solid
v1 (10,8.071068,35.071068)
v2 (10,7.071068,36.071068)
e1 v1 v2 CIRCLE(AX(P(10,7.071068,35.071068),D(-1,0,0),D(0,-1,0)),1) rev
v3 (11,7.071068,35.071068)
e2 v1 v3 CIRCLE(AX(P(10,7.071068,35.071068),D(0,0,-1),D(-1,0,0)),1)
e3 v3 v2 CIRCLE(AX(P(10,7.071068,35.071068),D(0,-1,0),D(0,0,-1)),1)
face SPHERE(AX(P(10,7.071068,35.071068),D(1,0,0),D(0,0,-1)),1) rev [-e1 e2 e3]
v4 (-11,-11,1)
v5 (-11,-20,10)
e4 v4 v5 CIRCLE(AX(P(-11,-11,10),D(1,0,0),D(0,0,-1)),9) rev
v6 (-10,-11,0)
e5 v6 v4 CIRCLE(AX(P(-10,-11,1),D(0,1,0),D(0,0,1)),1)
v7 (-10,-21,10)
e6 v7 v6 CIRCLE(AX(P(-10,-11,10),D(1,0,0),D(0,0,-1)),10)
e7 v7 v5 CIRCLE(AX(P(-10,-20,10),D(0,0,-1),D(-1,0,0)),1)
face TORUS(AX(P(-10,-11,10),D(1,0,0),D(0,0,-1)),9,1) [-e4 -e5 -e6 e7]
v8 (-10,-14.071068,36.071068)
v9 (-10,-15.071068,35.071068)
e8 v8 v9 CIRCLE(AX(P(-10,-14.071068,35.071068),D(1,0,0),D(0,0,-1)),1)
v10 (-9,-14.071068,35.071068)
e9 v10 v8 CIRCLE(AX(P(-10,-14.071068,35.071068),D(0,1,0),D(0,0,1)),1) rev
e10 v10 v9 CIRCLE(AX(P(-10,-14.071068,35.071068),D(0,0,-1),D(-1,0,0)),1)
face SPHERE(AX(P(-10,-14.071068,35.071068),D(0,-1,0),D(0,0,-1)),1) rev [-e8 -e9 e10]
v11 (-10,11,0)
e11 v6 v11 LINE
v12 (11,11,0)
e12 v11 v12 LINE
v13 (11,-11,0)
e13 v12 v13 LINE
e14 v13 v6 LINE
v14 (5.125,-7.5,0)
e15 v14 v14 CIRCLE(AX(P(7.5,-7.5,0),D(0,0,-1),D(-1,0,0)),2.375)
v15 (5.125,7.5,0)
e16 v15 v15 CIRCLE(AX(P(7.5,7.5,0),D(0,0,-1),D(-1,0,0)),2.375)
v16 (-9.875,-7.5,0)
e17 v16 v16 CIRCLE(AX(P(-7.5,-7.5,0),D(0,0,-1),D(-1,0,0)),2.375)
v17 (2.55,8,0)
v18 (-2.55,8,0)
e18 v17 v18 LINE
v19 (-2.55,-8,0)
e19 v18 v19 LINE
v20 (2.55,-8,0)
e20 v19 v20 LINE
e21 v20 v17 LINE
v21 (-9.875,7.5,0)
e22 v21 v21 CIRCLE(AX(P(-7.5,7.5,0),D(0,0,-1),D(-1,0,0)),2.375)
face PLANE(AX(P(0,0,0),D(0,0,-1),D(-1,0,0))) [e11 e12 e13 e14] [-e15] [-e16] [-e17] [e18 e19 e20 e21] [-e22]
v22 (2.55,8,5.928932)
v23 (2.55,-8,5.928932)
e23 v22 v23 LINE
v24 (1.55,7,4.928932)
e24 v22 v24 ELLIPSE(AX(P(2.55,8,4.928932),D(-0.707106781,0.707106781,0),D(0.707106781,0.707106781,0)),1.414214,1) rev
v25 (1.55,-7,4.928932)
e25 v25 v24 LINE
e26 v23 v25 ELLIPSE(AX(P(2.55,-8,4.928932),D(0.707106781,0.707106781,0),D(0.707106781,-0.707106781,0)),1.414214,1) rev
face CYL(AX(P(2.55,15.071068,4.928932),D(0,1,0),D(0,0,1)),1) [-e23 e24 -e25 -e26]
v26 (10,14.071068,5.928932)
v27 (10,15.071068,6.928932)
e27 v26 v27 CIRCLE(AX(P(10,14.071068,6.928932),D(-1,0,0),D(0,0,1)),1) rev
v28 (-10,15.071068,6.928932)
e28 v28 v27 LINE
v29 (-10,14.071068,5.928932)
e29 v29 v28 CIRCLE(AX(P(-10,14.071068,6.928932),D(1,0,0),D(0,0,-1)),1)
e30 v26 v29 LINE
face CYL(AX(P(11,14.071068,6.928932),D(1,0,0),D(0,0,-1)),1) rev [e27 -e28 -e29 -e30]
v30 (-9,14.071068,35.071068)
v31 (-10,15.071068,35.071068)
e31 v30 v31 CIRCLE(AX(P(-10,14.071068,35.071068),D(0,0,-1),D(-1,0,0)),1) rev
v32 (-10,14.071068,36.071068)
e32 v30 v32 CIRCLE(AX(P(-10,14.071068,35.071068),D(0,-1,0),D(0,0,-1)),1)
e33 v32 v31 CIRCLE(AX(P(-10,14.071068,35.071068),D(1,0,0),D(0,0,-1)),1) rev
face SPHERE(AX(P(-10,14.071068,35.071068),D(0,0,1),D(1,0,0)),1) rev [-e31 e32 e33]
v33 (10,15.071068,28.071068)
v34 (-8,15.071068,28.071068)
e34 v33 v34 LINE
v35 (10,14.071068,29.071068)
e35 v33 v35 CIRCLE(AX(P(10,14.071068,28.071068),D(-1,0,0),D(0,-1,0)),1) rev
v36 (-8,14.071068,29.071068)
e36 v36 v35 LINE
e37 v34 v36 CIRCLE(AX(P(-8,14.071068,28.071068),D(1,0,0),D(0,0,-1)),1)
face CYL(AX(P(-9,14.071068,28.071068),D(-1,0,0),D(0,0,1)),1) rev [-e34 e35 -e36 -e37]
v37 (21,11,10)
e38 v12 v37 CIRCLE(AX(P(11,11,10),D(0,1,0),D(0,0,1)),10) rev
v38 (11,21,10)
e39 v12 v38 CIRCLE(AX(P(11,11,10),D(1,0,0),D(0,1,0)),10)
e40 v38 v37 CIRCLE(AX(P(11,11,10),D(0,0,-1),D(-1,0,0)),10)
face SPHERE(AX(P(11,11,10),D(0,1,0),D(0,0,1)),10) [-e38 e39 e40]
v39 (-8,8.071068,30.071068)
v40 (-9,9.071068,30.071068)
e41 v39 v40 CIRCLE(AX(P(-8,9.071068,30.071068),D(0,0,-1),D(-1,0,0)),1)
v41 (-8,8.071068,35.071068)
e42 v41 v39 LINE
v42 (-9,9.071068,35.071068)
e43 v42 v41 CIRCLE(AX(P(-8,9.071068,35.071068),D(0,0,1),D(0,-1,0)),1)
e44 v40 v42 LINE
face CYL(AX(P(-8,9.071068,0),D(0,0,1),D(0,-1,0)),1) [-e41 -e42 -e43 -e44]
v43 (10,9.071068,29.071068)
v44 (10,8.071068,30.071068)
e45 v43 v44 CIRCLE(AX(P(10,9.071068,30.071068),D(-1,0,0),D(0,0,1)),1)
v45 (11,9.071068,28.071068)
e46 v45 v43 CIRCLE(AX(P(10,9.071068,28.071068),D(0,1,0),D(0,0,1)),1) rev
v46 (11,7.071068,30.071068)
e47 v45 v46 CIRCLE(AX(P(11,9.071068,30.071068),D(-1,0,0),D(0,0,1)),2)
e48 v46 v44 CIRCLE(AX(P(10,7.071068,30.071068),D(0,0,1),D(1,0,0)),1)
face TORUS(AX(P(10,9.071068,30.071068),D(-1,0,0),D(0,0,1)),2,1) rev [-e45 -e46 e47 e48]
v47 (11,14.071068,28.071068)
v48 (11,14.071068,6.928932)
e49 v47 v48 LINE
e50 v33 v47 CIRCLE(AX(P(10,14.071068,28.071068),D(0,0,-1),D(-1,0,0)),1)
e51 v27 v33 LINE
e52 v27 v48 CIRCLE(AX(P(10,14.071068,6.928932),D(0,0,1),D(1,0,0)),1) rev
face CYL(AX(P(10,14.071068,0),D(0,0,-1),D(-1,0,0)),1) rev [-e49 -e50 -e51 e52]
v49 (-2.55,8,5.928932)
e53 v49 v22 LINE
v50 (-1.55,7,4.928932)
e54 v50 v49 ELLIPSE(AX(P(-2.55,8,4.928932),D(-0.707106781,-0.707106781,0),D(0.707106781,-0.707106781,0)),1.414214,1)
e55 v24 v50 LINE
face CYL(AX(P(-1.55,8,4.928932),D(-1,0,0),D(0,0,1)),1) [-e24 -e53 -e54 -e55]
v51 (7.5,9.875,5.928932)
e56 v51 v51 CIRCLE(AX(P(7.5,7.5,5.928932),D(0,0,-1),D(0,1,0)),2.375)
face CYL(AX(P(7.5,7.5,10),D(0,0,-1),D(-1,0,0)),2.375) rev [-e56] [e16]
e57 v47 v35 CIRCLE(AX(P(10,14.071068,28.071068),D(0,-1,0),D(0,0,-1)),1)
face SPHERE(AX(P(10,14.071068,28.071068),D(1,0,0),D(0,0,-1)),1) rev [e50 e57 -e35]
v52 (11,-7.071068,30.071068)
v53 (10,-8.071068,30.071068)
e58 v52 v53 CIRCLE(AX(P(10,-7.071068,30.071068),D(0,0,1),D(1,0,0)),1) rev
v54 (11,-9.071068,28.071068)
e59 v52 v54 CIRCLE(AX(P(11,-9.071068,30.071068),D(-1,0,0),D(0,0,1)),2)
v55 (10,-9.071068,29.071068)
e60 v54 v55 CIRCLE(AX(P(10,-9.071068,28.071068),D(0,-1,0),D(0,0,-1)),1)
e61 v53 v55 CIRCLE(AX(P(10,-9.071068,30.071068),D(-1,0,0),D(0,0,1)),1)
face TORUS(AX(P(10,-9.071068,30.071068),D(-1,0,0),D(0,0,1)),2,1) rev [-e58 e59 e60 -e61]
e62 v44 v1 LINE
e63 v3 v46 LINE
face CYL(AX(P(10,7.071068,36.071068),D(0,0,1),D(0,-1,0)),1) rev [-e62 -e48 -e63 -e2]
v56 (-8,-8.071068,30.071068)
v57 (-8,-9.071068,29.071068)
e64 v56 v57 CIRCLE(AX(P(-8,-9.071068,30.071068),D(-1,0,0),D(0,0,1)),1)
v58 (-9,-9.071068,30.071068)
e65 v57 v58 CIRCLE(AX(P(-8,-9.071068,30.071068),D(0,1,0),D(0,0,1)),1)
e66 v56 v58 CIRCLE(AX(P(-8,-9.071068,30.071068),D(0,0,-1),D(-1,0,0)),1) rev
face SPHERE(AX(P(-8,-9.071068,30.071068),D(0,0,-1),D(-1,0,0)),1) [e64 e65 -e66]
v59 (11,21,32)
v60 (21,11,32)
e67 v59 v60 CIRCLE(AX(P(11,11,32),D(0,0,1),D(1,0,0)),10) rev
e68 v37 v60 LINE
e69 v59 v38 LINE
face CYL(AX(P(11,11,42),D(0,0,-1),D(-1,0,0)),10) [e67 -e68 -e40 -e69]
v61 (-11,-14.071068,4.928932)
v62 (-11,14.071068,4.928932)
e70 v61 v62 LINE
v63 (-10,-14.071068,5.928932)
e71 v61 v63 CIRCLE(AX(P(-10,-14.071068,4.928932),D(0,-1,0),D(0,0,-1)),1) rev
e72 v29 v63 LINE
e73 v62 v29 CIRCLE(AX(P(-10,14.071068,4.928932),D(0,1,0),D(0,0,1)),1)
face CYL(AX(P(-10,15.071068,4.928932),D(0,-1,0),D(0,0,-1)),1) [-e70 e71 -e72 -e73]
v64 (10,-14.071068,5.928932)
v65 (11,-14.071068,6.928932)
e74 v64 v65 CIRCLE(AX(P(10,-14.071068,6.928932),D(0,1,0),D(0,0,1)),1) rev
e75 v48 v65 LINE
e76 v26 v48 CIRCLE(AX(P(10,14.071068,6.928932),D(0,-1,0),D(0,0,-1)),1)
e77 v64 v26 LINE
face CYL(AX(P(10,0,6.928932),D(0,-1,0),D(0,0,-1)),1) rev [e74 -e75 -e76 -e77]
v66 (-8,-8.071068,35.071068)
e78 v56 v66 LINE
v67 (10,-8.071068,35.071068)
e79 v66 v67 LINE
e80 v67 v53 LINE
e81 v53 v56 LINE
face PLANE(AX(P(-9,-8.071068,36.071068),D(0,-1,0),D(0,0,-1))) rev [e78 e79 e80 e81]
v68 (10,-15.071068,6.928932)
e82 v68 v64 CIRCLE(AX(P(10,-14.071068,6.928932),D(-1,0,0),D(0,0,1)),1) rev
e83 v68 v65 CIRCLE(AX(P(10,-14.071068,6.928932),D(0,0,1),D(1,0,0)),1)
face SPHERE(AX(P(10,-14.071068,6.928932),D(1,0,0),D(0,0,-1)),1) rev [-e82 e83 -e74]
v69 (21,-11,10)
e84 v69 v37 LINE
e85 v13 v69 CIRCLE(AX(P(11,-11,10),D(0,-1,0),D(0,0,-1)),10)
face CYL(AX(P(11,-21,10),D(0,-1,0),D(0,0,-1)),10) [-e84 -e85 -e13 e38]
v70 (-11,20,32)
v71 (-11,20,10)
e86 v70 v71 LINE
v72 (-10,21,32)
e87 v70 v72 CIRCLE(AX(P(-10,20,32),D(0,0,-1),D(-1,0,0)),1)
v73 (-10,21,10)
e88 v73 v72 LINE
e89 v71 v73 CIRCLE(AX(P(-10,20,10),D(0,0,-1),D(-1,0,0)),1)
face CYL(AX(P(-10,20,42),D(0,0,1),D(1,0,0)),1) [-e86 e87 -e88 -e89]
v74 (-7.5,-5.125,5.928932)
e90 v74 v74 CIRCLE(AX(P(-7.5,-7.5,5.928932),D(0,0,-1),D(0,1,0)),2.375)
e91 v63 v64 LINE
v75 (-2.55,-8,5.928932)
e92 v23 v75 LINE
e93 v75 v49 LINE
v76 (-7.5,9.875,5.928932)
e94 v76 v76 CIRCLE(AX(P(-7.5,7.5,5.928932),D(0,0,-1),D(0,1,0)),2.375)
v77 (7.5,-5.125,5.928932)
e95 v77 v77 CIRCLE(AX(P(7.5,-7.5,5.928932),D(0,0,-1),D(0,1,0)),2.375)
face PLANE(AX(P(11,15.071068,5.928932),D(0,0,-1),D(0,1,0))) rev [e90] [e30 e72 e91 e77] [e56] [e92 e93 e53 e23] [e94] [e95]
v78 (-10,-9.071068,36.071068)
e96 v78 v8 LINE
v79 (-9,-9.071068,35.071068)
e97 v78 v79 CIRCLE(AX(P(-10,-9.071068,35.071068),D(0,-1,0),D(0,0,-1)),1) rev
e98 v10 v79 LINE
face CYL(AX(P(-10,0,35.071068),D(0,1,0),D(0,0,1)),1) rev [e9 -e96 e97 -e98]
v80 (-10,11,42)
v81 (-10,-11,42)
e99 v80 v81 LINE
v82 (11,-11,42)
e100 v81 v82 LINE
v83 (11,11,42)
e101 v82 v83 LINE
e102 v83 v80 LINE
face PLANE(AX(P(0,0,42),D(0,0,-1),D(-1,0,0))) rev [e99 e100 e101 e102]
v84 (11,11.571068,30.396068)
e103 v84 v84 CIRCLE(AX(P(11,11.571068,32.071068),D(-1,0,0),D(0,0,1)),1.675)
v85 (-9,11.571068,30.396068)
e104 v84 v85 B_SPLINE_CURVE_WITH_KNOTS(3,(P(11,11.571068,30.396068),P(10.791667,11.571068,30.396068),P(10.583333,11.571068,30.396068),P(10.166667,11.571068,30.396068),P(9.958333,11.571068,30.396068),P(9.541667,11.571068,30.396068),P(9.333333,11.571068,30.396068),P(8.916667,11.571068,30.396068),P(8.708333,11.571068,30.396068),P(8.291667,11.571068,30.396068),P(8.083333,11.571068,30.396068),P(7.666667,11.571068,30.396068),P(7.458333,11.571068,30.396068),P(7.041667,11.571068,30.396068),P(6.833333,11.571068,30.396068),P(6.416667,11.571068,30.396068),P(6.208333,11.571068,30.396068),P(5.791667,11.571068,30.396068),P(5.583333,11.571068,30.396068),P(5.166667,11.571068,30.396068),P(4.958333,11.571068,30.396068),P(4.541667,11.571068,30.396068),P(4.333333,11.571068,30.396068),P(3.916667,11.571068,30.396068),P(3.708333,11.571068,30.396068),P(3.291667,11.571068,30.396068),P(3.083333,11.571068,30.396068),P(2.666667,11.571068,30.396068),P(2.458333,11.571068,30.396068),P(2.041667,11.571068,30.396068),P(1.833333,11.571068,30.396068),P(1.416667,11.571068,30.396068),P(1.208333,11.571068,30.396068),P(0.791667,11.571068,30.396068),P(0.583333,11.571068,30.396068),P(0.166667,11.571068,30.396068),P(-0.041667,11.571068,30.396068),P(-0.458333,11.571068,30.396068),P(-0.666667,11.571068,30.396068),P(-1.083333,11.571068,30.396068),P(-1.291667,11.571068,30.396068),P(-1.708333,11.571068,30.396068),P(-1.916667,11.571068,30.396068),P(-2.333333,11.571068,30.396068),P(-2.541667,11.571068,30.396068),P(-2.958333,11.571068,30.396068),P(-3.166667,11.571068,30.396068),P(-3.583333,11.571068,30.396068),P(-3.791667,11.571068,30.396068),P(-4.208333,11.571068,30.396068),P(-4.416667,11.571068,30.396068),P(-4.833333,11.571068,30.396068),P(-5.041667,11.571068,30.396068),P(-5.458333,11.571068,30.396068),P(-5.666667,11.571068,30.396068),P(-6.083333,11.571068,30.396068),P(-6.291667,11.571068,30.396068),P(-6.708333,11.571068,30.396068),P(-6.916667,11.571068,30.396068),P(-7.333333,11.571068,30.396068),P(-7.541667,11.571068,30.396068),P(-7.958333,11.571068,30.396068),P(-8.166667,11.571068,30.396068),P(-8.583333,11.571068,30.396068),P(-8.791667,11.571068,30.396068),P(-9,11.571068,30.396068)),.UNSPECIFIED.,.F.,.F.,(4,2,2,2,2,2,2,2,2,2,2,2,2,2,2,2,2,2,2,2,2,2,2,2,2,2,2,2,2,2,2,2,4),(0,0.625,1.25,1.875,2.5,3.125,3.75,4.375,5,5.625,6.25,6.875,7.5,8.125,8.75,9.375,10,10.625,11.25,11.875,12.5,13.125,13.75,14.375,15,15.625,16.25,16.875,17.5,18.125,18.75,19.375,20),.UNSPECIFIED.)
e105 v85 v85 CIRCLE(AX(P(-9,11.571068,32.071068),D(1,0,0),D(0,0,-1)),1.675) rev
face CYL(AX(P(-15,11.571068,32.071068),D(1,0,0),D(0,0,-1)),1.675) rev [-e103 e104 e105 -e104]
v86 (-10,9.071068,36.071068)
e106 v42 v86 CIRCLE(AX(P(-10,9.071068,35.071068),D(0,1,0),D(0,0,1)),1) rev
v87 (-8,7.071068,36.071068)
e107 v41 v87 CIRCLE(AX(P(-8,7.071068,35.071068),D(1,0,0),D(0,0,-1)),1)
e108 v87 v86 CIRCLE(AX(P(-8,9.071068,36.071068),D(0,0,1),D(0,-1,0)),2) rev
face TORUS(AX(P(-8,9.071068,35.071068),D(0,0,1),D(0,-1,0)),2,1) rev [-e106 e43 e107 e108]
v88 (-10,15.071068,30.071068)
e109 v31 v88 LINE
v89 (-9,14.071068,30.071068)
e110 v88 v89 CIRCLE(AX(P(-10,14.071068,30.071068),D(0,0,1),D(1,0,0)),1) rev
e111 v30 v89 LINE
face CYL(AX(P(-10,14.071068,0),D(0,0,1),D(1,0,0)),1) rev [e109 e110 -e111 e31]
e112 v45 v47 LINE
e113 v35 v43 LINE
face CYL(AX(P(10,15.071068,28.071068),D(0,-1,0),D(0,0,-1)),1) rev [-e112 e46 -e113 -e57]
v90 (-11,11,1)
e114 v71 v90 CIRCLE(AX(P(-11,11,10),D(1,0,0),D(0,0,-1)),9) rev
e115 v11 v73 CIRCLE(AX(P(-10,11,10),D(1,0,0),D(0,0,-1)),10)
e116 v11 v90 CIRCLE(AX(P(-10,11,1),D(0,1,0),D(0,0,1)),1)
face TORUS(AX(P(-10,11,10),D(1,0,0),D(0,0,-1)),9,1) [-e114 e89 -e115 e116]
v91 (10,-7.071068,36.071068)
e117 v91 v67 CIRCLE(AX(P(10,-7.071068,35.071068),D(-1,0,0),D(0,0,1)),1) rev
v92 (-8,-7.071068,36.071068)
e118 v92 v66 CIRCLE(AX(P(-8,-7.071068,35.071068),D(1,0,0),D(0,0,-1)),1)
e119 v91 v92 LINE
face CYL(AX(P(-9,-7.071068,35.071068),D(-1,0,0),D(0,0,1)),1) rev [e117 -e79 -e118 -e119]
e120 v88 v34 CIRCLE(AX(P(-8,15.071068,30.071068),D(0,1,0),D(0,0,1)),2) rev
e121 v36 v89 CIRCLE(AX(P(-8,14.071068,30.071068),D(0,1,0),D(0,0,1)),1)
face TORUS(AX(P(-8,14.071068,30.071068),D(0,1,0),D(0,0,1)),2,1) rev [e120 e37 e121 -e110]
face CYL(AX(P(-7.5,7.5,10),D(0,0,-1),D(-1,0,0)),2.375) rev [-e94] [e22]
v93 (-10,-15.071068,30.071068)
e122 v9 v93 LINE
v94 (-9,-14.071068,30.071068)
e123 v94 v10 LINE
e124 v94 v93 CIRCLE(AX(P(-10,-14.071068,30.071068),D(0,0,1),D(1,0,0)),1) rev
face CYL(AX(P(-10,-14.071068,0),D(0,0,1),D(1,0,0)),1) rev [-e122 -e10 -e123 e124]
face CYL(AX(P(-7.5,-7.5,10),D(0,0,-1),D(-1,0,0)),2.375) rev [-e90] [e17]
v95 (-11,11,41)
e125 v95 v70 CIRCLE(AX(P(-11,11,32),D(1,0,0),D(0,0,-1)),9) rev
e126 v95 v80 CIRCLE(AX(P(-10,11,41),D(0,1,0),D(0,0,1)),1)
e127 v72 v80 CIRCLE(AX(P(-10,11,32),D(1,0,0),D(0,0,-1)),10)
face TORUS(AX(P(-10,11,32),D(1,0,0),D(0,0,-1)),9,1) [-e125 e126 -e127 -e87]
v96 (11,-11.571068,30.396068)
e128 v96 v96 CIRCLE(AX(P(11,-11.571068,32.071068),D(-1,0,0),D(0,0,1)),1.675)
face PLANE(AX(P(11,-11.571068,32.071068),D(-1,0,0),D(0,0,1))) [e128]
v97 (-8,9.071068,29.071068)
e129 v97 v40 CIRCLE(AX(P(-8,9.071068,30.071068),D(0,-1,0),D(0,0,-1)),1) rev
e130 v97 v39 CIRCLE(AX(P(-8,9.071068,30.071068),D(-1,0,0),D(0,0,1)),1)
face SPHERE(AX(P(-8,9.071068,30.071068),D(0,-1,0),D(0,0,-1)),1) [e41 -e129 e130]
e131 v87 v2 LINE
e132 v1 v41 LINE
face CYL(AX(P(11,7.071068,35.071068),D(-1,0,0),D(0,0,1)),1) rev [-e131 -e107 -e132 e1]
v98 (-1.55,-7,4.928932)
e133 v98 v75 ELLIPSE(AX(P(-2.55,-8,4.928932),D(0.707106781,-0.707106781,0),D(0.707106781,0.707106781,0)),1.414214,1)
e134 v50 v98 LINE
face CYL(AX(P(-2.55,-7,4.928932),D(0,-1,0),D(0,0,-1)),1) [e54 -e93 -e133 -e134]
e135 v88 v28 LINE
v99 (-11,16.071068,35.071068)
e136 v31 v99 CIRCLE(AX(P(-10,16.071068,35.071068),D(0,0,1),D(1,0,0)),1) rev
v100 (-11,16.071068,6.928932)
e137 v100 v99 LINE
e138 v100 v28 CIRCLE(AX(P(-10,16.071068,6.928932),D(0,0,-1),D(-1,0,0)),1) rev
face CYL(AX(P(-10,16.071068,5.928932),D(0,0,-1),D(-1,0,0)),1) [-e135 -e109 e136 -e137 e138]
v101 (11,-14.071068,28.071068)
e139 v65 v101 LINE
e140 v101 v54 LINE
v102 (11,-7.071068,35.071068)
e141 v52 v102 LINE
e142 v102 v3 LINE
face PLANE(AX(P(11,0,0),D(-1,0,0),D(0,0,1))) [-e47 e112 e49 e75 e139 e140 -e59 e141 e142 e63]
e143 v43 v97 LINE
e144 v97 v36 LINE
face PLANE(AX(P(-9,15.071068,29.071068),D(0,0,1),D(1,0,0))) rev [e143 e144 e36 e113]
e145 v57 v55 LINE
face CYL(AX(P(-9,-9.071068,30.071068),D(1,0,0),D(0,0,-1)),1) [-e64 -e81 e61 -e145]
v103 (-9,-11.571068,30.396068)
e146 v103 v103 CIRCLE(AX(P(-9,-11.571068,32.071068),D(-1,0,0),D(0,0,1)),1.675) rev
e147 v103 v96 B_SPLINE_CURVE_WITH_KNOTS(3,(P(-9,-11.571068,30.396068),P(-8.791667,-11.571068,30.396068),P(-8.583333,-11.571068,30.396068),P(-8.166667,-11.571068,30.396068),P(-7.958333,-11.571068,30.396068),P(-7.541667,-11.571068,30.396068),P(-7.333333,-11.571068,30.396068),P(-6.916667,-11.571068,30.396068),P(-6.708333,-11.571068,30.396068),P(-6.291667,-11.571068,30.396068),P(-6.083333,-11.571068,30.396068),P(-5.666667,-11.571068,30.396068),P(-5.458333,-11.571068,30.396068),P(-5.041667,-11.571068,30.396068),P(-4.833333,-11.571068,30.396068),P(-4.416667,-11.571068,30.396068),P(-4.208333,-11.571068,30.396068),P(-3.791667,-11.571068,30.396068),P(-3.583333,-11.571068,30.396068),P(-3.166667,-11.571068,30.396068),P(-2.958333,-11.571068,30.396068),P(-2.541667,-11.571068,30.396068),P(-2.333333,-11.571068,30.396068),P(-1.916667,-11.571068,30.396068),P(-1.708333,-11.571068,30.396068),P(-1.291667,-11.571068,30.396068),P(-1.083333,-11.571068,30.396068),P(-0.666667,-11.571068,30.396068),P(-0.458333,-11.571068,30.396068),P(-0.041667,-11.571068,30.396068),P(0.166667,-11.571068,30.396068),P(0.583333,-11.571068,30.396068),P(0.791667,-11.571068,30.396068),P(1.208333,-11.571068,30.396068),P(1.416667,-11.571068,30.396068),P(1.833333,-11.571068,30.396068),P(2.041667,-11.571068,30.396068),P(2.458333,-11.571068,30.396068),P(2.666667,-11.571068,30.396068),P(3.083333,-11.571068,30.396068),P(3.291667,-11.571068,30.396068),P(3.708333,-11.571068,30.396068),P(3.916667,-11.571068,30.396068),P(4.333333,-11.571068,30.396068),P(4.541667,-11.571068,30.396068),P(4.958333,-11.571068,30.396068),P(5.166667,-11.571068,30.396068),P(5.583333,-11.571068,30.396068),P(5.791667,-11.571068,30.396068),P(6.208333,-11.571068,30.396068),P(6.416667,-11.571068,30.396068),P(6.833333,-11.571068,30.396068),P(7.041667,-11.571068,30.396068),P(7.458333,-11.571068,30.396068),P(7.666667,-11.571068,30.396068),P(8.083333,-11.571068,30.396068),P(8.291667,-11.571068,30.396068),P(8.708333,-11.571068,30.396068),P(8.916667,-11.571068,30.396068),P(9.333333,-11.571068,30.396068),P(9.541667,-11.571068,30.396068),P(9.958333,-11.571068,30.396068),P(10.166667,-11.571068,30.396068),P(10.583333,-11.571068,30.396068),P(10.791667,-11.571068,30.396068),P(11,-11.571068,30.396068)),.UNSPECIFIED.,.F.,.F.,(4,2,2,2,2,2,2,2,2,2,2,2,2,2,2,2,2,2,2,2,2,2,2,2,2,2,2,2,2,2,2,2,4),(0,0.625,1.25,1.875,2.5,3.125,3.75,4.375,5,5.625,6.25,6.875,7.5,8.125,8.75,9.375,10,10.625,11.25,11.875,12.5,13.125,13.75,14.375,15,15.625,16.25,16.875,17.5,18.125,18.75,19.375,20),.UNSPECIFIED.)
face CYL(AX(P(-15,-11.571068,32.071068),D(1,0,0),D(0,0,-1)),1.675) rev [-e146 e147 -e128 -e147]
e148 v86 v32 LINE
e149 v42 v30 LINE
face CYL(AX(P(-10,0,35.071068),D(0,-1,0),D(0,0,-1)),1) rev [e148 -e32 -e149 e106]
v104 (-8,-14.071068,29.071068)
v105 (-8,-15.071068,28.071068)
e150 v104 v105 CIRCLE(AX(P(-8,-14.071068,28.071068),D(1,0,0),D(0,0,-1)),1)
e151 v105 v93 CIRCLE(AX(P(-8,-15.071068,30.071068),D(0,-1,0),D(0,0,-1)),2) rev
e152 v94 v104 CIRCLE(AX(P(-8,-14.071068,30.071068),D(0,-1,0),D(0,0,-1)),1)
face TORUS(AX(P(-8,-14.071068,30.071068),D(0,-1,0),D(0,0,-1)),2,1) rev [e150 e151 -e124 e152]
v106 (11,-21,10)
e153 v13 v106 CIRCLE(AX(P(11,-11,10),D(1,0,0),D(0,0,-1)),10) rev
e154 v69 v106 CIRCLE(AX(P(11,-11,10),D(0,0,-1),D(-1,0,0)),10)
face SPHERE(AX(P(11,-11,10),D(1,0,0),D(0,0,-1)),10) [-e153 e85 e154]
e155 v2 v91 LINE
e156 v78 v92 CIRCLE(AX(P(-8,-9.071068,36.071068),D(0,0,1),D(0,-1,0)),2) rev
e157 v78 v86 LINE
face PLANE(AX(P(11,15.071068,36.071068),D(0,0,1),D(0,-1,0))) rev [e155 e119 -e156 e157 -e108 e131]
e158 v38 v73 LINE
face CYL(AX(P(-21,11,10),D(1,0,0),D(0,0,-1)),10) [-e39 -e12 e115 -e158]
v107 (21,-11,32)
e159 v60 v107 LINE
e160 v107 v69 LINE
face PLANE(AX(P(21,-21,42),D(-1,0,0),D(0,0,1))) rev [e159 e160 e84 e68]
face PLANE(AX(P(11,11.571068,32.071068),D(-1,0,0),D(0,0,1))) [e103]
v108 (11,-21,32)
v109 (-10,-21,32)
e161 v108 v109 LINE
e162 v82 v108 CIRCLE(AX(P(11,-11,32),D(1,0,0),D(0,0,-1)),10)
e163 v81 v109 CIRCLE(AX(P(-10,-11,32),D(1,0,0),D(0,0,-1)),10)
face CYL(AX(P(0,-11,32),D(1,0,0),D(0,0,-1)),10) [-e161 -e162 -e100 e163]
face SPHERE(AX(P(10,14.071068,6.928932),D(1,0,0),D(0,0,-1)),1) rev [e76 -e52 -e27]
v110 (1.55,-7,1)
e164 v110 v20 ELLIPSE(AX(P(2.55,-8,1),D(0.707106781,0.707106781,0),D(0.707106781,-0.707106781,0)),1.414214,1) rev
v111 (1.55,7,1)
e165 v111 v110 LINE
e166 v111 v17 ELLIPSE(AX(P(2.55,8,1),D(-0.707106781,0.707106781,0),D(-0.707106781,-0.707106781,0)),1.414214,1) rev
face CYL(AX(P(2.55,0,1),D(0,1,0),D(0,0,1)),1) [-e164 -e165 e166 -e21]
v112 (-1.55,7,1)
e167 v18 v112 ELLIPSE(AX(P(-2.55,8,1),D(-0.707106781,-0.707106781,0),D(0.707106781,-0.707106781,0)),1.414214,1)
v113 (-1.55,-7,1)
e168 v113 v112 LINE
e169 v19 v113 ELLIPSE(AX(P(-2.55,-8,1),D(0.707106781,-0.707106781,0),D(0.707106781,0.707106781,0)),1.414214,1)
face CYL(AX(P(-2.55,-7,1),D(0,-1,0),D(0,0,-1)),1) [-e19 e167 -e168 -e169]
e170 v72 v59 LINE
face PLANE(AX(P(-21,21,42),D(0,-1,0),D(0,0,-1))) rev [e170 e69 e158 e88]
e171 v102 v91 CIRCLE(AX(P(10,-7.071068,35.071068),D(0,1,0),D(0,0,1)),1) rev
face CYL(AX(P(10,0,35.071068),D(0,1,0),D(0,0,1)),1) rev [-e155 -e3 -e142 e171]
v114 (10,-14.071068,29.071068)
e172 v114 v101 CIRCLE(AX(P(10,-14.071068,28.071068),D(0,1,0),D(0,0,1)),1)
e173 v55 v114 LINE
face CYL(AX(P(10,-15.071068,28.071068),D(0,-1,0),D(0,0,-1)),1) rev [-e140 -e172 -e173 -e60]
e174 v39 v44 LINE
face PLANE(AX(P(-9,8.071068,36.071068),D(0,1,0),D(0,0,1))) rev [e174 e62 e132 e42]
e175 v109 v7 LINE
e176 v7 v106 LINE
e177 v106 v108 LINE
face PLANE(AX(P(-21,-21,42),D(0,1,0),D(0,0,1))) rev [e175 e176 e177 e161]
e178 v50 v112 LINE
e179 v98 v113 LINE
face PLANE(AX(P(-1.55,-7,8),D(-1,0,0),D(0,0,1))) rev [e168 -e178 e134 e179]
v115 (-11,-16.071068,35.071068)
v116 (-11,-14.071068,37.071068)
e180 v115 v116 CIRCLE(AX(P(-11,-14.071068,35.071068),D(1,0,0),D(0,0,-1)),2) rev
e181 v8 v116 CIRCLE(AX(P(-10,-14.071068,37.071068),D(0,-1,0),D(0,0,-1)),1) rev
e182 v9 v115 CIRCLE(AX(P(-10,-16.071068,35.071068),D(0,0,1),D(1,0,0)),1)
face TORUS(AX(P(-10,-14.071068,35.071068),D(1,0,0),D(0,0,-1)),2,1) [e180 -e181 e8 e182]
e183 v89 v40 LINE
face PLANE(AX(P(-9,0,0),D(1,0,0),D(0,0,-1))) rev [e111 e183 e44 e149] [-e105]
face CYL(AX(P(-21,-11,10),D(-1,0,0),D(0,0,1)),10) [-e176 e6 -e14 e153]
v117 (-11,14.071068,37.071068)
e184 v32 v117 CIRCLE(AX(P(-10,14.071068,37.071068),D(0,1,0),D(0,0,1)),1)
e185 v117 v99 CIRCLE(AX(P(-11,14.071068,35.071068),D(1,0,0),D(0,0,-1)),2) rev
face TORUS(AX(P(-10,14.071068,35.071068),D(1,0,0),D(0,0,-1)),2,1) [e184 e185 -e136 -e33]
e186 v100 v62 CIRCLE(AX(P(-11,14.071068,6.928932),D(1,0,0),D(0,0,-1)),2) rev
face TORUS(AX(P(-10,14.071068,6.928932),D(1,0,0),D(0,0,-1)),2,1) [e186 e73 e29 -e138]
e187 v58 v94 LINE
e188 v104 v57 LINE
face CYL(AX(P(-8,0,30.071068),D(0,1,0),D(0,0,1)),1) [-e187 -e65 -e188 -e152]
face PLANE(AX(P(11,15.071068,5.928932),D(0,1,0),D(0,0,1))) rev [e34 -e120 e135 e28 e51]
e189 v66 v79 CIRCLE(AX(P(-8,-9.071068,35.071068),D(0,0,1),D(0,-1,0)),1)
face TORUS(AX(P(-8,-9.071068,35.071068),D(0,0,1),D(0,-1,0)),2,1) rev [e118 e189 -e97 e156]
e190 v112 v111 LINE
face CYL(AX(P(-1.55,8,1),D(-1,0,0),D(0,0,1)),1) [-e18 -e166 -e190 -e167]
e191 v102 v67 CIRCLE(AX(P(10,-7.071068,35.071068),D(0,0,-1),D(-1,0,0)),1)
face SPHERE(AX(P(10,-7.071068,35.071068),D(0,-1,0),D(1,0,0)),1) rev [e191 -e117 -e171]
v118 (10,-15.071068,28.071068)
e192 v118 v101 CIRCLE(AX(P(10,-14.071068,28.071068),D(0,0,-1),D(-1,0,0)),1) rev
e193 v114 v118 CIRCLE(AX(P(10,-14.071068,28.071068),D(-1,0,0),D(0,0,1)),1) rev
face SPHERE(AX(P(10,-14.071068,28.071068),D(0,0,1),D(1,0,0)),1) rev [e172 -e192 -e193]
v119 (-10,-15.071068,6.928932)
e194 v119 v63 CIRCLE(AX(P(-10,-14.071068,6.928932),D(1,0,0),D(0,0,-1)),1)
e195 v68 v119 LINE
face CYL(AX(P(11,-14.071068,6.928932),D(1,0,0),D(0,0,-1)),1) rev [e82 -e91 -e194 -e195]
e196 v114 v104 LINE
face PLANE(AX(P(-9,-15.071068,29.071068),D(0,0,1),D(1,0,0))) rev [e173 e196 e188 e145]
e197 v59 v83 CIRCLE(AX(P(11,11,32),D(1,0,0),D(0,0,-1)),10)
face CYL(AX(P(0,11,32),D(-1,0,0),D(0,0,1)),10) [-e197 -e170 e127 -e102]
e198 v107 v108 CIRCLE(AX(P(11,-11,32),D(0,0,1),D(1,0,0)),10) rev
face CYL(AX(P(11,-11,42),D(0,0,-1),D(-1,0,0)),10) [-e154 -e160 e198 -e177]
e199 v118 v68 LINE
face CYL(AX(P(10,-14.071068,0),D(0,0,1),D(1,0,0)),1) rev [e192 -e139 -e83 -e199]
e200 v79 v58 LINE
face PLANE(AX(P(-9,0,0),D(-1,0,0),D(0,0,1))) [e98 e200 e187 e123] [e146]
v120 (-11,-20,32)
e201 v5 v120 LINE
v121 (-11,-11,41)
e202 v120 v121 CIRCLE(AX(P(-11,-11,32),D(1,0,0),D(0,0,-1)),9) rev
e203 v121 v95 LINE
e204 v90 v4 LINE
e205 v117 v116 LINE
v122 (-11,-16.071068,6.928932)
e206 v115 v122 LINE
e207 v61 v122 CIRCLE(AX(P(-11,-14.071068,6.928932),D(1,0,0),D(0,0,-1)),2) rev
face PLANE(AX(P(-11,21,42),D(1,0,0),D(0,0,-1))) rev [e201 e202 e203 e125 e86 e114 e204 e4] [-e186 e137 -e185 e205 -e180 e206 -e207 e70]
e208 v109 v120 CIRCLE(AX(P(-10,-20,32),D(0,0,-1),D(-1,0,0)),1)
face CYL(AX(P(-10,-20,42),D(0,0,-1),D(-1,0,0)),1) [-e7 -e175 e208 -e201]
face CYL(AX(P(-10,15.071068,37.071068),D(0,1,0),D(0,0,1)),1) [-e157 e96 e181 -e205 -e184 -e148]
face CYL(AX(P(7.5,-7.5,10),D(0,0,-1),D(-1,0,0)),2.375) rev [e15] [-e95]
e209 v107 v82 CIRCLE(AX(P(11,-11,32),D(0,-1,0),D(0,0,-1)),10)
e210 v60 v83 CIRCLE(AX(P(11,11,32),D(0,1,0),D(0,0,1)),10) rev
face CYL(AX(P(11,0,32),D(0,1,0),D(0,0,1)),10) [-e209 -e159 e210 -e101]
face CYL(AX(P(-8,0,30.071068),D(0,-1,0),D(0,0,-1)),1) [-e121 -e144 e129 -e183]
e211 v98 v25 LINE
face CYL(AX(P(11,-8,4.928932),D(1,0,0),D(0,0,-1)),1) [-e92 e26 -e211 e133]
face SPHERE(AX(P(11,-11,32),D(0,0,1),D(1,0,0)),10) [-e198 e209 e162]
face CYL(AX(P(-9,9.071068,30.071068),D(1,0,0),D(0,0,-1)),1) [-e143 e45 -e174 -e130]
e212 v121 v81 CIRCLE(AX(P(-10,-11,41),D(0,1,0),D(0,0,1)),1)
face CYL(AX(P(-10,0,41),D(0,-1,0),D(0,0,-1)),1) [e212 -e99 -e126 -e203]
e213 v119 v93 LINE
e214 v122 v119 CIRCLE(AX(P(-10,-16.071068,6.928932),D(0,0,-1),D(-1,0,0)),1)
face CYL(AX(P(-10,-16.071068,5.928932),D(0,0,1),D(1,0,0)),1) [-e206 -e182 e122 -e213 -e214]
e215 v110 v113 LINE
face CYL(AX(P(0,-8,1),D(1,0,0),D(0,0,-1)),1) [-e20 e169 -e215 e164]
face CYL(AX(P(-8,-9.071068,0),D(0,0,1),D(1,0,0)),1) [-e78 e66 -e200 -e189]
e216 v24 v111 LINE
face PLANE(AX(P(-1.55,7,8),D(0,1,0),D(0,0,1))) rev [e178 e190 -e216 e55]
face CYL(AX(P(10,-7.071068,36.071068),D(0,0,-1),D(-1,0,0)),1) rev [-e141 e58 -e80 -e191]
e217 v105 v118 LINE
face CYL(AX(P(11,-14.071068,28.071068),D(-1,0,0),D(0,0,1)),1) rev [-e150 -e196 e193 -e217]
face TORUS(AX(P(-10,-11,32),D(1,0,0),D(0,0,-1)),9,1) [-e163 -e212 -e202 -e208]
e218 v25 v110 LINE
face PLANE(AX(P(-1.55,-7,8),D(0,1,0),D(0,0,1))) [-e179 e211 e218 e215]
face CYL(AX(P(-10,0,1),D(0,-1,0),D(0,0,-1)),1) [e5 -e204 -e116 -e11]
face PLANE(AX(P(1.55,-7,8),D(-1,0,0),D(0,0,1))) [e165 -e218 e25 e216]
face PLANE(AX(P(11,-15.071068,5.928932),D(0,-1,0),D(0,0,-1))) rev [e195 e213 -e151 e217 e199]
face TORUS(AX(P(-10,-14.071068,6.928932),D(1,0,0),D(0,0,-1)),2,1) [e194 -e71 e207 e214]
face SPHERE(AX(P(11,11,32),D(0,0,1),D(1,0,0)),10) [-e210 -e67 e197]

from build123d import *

# Parameters (mm, degrees)
ESQUISSE1_W             = 42
ESQUISSE1_H             = 42
BOSS_EXTRU_1_DEPTH      = 42
CONG_1_R                = 10
ESQUISSE10_W            = 10.140474199
ESQUISSE10_H            = 42
ENL_V_MAT_EXTRU_1_DEPTH = 64
ESQUISSE2_W             = 3.1
ESQUISSE2_H             = 14
ENL_V_MAT_EXTRU_5_DEPTH = 8
ESQUISSE14_W            = 30.142135624
ESQUISSE14_H            = 30.142135624
ENL_V_MAT_EXTRU_6_DEPTH = 22
ESQUISSE21_W            = 7
ESQUISSE21_H            = 7
BOSS_EXTRU_2_DEPTH      = 20
ESQUISSE24_R            = 1.675
ENL_V_MAT_EXTRU_8_DEPTH = 26
CONG_2_R                = 1
ESQUISSE27_R            = 2.375
ENL_V_MAT_EXTRU_9_DEPTH = 10


with BuildPart() as part:
    # Esquisse1 → Boss.-Extru.1 (new body)
    with BuildSketch(Plane.XY):
        Rectangle(ESQUISSE1_W, ESQUISSE1_H)
    extrude(amount=BOSS_EXTRU_1_DEPTH)

    # Congé1
    cong_1_edges = [part.edges().sort_by_distance(p)[0] for p in [
        (-21, 0, 42),
        (0, -21, 42),
        (21, 0, 42),
        (0, -21, 0),
        (-21, 0, 0),
        (0, 21, 0),
        (21, 0, 0),
        (21, -21, 21),
        (-21, -21, 21),
        (-21, 21, 21),
        (21, 21, 21),
        (0, 21, 42),
    ]]
    fillet(cong_1_edges, radius=CONG_1_R)

    # Esquisse10 → Enlèv. mat.-Extru.1 (cut, through all)
    with BuildSketch(Plane(origin=(0, -21, 0), x_dir=(-1, 0, 0), z_dir=(0, -1, 0))):
        with Locations((16.070237099, -21)):
            Rectangle(ESQUISSE10_W, ESQUISSE10_H)
    extrude(amount=-ENL_V_MAT_EXTRU_1_DEPTH, mode=Mode.SUBTRACT)

    # Esquisse2 → Enlèv. mat.-Extru.5 (cut)
    with BuildSketch(Plane(origin=(0, 0, 0), x_dir=(-1, 0, 0), z_dir=(0, 0, -1))):
        Rectangle(ESQUISSE2_W, ESQUISSE2_H)
    extrude(amount=-ENL_V_MAT_EXTRU_5_DEPTH, mode=Mode.SUBTRACT)

    # Esquisse14 → Enlèv. mat.-Extru.6 (cut)
    with BuildSketch(Plane.ZY.offset(11)):
        with Locations((21, 0)):
            Rectangle(ESQUISSE14_W, ESQUISSE14_H)
    extrude(amount=-ENL_V_MAT_EXTRU_6_DEPTH, mode=Mode.SUBTRACT)

    # Esquisse21 → Boss.-Extru.2 (add)
    with BuildSketch(Plane.ZY.offset(-11)):
        with Locations((32.571067812, -11.571067812)):
            Rectangle(ESQUISSE21_W, ESQUISSE21_H)
        with Locations((32.571067812, 11.571067812)):
            Rectangle(ESQUISSE21_W, ESQUISSE21_H)
    extrude(amount=BOSS_EXTRU_2_DEPTH)

    # Esquisse24 → Enlèv. mat.-Extru.8 (cut)
    with BuildSketch(Plane.ZY.offset(-11)):
        with Locations(Location((32.071067812, 11.571067812, 0), (0, 0, 180))):
            Circle(ESQUISSE24_R)
        with Locations(Location((32.071067812, -11.571067812, 0), (0, 0, 180))):
            Circle(ESQUISSE24_R)
    extrude(amount=ENL_V_MAT_EXTRU_8_DEPTH, mode=Mode.SUBTRACT)

    # Congé2
    cong_2_edges = [part.edges().sort_by_distance(p)[0] for p in [
        (11, -15.071067812, 17.5),
        (-11, 0, 5.928932188),
        (-11, -15.071067812, 21),
        (-11, 0, 36.071067812),
        (-11, 15.071067812, 21),
        (11, 0, 36.071067812),
        (-10, -15.071067812, 36.071067812),
        (11, -8.071067812, 32.571067812),
        (1, -8.071067812, 36.071067812),
        (11, -11.571067812, 29.071067812),
        (1, -8.071067812, 29.071067812),
        (1, -15.071067812, 29.071067812),
        (-9, -11.571067812, 36.071067812),
        (-9, -8.071067812, 32.571067812),
        (-9, -11.571067812, 29.071067812),
        (-9, -15.071067812, 32.571067812),
        (11, 15.071067812, 17.5),
        (-10, 15.071067812, 36.071067812),
        (1, 8.071067812, 36.071067812),
        (11, 11.571067812, 29.071067812),
        (1, 15.071067812, 29.071067812),
        (11, 8.071067812, 32.571067812),
        (1, 8.071067812, 29.071067812),
        (-9, 11.571067812, 36.071067812),
        (-9, 15.071067812, 32.571067812),
        (-9, 11.571067812, 29.071067812),
        (-9, 8.071067812, 32.571067812),
        (-11, -21, 21),
        (-11, 0, 0),
        (-11, 21, 21),
        (-11, 0, 42),
        (-11, 18.071067812, 39.071067812),
        (-11, 18.071067812, 2.928932188),
        (-11, -18.071067812, 39.071067812),
        (-11, -18.071067812, 2.928932188),
        (0, -7, 0),
        (1.55, 0, 0),
        (0, 7, 0),
        (-1.55, 0, 0),
        (1.55, 0, 5.928932188),
        (11, 0, 5.928932188),
        (0, -15.071067812, 5.928932188),
        (0, 7, 5.928932188),
        (-1.55, 0, 5.928932188),
        (0, -7, 5.928932188),
        (0, 15.071067812, 5.928932188),
    ]]
    fillet(cong_2_edges, radius=CONG_2_R - 0.0001)  # a hair under: the kernel refuses the full size

    # Esquisse27 → Enlèv. mat.-Extru.9 (cut)
    with BuildSketch(Plane(origin=(0, 0, 0), x_dir=(-1, 0, 0), z_dir=(0, 0, -1))):
        with BuildLine():
            ThreePointArc((5.125, 7.5), (5.820621395, 5.820621395), (7.5, 5.125))
            Line((7.5, 5.125), (7.5, 7.5))
            Line((7.5, 7.5), (5.125, 7.5))
        make_face()
        with BuildLine():
            Line((7.5, 7.5), (7.5, 5.125))
            ThreePointArc((7.5, 5.125), (9.179378605, 5.820621395), (9.875, 7.5))
            ThreePointArc((9.875, 7.5), (7.5, 9.875), (5.125, 7.5))
            Line((5.125, 7.5), (7.5, 7.5))
        make_face()
        with BuildLine():
            ThreePointArc((-5.125, 7.5), (-9.179378605, 9.179378605), (-7.5, 5.125))
            Line((-7.5, 5.125), (-7.5, 7.5))
            Line((-7.5, 7.5), (-5.125, 7.5))
        make_face()
        with BuildLine():
            Line((-7.5, 7.5), (-7.5, 5.125))
            ThreePointArc((-7.5, 5.125), (-5.820621395, 5.820621395), (-5.125, 7.5))
            Line((-5.125, 7.5), (-7.5, 7.5))
        make_face()
        with BuildLine():
            Line((-7.5, -5.125), (-7.5, -7.5))
            Line((-7.5, -7.5), (-5.125, -7.5))
            ThreePointArc((-5.125, -7.5), (-5.820621395, -5.820621395), (-7.5, -5.125))
        make_face()
        with BuildLine():
            Line((-5.125, -7.5), (-7.5, -7.5))
            Line((-7.5, -7.5), (-7.5, -5.125))
            ThreePointArc((-7.5, -5.125), (-9.179378605, -9.179378605), (-5.125, -7.5))
        make_face()
        with Locations((7.5, -7.5)):
            Circle(ESQUISSE27_R)
    extrude(amount=-ENL_V_MAT_EXTRU_9_DEPTH, mode=Mode.SUBTRACT)


solid = part.part
